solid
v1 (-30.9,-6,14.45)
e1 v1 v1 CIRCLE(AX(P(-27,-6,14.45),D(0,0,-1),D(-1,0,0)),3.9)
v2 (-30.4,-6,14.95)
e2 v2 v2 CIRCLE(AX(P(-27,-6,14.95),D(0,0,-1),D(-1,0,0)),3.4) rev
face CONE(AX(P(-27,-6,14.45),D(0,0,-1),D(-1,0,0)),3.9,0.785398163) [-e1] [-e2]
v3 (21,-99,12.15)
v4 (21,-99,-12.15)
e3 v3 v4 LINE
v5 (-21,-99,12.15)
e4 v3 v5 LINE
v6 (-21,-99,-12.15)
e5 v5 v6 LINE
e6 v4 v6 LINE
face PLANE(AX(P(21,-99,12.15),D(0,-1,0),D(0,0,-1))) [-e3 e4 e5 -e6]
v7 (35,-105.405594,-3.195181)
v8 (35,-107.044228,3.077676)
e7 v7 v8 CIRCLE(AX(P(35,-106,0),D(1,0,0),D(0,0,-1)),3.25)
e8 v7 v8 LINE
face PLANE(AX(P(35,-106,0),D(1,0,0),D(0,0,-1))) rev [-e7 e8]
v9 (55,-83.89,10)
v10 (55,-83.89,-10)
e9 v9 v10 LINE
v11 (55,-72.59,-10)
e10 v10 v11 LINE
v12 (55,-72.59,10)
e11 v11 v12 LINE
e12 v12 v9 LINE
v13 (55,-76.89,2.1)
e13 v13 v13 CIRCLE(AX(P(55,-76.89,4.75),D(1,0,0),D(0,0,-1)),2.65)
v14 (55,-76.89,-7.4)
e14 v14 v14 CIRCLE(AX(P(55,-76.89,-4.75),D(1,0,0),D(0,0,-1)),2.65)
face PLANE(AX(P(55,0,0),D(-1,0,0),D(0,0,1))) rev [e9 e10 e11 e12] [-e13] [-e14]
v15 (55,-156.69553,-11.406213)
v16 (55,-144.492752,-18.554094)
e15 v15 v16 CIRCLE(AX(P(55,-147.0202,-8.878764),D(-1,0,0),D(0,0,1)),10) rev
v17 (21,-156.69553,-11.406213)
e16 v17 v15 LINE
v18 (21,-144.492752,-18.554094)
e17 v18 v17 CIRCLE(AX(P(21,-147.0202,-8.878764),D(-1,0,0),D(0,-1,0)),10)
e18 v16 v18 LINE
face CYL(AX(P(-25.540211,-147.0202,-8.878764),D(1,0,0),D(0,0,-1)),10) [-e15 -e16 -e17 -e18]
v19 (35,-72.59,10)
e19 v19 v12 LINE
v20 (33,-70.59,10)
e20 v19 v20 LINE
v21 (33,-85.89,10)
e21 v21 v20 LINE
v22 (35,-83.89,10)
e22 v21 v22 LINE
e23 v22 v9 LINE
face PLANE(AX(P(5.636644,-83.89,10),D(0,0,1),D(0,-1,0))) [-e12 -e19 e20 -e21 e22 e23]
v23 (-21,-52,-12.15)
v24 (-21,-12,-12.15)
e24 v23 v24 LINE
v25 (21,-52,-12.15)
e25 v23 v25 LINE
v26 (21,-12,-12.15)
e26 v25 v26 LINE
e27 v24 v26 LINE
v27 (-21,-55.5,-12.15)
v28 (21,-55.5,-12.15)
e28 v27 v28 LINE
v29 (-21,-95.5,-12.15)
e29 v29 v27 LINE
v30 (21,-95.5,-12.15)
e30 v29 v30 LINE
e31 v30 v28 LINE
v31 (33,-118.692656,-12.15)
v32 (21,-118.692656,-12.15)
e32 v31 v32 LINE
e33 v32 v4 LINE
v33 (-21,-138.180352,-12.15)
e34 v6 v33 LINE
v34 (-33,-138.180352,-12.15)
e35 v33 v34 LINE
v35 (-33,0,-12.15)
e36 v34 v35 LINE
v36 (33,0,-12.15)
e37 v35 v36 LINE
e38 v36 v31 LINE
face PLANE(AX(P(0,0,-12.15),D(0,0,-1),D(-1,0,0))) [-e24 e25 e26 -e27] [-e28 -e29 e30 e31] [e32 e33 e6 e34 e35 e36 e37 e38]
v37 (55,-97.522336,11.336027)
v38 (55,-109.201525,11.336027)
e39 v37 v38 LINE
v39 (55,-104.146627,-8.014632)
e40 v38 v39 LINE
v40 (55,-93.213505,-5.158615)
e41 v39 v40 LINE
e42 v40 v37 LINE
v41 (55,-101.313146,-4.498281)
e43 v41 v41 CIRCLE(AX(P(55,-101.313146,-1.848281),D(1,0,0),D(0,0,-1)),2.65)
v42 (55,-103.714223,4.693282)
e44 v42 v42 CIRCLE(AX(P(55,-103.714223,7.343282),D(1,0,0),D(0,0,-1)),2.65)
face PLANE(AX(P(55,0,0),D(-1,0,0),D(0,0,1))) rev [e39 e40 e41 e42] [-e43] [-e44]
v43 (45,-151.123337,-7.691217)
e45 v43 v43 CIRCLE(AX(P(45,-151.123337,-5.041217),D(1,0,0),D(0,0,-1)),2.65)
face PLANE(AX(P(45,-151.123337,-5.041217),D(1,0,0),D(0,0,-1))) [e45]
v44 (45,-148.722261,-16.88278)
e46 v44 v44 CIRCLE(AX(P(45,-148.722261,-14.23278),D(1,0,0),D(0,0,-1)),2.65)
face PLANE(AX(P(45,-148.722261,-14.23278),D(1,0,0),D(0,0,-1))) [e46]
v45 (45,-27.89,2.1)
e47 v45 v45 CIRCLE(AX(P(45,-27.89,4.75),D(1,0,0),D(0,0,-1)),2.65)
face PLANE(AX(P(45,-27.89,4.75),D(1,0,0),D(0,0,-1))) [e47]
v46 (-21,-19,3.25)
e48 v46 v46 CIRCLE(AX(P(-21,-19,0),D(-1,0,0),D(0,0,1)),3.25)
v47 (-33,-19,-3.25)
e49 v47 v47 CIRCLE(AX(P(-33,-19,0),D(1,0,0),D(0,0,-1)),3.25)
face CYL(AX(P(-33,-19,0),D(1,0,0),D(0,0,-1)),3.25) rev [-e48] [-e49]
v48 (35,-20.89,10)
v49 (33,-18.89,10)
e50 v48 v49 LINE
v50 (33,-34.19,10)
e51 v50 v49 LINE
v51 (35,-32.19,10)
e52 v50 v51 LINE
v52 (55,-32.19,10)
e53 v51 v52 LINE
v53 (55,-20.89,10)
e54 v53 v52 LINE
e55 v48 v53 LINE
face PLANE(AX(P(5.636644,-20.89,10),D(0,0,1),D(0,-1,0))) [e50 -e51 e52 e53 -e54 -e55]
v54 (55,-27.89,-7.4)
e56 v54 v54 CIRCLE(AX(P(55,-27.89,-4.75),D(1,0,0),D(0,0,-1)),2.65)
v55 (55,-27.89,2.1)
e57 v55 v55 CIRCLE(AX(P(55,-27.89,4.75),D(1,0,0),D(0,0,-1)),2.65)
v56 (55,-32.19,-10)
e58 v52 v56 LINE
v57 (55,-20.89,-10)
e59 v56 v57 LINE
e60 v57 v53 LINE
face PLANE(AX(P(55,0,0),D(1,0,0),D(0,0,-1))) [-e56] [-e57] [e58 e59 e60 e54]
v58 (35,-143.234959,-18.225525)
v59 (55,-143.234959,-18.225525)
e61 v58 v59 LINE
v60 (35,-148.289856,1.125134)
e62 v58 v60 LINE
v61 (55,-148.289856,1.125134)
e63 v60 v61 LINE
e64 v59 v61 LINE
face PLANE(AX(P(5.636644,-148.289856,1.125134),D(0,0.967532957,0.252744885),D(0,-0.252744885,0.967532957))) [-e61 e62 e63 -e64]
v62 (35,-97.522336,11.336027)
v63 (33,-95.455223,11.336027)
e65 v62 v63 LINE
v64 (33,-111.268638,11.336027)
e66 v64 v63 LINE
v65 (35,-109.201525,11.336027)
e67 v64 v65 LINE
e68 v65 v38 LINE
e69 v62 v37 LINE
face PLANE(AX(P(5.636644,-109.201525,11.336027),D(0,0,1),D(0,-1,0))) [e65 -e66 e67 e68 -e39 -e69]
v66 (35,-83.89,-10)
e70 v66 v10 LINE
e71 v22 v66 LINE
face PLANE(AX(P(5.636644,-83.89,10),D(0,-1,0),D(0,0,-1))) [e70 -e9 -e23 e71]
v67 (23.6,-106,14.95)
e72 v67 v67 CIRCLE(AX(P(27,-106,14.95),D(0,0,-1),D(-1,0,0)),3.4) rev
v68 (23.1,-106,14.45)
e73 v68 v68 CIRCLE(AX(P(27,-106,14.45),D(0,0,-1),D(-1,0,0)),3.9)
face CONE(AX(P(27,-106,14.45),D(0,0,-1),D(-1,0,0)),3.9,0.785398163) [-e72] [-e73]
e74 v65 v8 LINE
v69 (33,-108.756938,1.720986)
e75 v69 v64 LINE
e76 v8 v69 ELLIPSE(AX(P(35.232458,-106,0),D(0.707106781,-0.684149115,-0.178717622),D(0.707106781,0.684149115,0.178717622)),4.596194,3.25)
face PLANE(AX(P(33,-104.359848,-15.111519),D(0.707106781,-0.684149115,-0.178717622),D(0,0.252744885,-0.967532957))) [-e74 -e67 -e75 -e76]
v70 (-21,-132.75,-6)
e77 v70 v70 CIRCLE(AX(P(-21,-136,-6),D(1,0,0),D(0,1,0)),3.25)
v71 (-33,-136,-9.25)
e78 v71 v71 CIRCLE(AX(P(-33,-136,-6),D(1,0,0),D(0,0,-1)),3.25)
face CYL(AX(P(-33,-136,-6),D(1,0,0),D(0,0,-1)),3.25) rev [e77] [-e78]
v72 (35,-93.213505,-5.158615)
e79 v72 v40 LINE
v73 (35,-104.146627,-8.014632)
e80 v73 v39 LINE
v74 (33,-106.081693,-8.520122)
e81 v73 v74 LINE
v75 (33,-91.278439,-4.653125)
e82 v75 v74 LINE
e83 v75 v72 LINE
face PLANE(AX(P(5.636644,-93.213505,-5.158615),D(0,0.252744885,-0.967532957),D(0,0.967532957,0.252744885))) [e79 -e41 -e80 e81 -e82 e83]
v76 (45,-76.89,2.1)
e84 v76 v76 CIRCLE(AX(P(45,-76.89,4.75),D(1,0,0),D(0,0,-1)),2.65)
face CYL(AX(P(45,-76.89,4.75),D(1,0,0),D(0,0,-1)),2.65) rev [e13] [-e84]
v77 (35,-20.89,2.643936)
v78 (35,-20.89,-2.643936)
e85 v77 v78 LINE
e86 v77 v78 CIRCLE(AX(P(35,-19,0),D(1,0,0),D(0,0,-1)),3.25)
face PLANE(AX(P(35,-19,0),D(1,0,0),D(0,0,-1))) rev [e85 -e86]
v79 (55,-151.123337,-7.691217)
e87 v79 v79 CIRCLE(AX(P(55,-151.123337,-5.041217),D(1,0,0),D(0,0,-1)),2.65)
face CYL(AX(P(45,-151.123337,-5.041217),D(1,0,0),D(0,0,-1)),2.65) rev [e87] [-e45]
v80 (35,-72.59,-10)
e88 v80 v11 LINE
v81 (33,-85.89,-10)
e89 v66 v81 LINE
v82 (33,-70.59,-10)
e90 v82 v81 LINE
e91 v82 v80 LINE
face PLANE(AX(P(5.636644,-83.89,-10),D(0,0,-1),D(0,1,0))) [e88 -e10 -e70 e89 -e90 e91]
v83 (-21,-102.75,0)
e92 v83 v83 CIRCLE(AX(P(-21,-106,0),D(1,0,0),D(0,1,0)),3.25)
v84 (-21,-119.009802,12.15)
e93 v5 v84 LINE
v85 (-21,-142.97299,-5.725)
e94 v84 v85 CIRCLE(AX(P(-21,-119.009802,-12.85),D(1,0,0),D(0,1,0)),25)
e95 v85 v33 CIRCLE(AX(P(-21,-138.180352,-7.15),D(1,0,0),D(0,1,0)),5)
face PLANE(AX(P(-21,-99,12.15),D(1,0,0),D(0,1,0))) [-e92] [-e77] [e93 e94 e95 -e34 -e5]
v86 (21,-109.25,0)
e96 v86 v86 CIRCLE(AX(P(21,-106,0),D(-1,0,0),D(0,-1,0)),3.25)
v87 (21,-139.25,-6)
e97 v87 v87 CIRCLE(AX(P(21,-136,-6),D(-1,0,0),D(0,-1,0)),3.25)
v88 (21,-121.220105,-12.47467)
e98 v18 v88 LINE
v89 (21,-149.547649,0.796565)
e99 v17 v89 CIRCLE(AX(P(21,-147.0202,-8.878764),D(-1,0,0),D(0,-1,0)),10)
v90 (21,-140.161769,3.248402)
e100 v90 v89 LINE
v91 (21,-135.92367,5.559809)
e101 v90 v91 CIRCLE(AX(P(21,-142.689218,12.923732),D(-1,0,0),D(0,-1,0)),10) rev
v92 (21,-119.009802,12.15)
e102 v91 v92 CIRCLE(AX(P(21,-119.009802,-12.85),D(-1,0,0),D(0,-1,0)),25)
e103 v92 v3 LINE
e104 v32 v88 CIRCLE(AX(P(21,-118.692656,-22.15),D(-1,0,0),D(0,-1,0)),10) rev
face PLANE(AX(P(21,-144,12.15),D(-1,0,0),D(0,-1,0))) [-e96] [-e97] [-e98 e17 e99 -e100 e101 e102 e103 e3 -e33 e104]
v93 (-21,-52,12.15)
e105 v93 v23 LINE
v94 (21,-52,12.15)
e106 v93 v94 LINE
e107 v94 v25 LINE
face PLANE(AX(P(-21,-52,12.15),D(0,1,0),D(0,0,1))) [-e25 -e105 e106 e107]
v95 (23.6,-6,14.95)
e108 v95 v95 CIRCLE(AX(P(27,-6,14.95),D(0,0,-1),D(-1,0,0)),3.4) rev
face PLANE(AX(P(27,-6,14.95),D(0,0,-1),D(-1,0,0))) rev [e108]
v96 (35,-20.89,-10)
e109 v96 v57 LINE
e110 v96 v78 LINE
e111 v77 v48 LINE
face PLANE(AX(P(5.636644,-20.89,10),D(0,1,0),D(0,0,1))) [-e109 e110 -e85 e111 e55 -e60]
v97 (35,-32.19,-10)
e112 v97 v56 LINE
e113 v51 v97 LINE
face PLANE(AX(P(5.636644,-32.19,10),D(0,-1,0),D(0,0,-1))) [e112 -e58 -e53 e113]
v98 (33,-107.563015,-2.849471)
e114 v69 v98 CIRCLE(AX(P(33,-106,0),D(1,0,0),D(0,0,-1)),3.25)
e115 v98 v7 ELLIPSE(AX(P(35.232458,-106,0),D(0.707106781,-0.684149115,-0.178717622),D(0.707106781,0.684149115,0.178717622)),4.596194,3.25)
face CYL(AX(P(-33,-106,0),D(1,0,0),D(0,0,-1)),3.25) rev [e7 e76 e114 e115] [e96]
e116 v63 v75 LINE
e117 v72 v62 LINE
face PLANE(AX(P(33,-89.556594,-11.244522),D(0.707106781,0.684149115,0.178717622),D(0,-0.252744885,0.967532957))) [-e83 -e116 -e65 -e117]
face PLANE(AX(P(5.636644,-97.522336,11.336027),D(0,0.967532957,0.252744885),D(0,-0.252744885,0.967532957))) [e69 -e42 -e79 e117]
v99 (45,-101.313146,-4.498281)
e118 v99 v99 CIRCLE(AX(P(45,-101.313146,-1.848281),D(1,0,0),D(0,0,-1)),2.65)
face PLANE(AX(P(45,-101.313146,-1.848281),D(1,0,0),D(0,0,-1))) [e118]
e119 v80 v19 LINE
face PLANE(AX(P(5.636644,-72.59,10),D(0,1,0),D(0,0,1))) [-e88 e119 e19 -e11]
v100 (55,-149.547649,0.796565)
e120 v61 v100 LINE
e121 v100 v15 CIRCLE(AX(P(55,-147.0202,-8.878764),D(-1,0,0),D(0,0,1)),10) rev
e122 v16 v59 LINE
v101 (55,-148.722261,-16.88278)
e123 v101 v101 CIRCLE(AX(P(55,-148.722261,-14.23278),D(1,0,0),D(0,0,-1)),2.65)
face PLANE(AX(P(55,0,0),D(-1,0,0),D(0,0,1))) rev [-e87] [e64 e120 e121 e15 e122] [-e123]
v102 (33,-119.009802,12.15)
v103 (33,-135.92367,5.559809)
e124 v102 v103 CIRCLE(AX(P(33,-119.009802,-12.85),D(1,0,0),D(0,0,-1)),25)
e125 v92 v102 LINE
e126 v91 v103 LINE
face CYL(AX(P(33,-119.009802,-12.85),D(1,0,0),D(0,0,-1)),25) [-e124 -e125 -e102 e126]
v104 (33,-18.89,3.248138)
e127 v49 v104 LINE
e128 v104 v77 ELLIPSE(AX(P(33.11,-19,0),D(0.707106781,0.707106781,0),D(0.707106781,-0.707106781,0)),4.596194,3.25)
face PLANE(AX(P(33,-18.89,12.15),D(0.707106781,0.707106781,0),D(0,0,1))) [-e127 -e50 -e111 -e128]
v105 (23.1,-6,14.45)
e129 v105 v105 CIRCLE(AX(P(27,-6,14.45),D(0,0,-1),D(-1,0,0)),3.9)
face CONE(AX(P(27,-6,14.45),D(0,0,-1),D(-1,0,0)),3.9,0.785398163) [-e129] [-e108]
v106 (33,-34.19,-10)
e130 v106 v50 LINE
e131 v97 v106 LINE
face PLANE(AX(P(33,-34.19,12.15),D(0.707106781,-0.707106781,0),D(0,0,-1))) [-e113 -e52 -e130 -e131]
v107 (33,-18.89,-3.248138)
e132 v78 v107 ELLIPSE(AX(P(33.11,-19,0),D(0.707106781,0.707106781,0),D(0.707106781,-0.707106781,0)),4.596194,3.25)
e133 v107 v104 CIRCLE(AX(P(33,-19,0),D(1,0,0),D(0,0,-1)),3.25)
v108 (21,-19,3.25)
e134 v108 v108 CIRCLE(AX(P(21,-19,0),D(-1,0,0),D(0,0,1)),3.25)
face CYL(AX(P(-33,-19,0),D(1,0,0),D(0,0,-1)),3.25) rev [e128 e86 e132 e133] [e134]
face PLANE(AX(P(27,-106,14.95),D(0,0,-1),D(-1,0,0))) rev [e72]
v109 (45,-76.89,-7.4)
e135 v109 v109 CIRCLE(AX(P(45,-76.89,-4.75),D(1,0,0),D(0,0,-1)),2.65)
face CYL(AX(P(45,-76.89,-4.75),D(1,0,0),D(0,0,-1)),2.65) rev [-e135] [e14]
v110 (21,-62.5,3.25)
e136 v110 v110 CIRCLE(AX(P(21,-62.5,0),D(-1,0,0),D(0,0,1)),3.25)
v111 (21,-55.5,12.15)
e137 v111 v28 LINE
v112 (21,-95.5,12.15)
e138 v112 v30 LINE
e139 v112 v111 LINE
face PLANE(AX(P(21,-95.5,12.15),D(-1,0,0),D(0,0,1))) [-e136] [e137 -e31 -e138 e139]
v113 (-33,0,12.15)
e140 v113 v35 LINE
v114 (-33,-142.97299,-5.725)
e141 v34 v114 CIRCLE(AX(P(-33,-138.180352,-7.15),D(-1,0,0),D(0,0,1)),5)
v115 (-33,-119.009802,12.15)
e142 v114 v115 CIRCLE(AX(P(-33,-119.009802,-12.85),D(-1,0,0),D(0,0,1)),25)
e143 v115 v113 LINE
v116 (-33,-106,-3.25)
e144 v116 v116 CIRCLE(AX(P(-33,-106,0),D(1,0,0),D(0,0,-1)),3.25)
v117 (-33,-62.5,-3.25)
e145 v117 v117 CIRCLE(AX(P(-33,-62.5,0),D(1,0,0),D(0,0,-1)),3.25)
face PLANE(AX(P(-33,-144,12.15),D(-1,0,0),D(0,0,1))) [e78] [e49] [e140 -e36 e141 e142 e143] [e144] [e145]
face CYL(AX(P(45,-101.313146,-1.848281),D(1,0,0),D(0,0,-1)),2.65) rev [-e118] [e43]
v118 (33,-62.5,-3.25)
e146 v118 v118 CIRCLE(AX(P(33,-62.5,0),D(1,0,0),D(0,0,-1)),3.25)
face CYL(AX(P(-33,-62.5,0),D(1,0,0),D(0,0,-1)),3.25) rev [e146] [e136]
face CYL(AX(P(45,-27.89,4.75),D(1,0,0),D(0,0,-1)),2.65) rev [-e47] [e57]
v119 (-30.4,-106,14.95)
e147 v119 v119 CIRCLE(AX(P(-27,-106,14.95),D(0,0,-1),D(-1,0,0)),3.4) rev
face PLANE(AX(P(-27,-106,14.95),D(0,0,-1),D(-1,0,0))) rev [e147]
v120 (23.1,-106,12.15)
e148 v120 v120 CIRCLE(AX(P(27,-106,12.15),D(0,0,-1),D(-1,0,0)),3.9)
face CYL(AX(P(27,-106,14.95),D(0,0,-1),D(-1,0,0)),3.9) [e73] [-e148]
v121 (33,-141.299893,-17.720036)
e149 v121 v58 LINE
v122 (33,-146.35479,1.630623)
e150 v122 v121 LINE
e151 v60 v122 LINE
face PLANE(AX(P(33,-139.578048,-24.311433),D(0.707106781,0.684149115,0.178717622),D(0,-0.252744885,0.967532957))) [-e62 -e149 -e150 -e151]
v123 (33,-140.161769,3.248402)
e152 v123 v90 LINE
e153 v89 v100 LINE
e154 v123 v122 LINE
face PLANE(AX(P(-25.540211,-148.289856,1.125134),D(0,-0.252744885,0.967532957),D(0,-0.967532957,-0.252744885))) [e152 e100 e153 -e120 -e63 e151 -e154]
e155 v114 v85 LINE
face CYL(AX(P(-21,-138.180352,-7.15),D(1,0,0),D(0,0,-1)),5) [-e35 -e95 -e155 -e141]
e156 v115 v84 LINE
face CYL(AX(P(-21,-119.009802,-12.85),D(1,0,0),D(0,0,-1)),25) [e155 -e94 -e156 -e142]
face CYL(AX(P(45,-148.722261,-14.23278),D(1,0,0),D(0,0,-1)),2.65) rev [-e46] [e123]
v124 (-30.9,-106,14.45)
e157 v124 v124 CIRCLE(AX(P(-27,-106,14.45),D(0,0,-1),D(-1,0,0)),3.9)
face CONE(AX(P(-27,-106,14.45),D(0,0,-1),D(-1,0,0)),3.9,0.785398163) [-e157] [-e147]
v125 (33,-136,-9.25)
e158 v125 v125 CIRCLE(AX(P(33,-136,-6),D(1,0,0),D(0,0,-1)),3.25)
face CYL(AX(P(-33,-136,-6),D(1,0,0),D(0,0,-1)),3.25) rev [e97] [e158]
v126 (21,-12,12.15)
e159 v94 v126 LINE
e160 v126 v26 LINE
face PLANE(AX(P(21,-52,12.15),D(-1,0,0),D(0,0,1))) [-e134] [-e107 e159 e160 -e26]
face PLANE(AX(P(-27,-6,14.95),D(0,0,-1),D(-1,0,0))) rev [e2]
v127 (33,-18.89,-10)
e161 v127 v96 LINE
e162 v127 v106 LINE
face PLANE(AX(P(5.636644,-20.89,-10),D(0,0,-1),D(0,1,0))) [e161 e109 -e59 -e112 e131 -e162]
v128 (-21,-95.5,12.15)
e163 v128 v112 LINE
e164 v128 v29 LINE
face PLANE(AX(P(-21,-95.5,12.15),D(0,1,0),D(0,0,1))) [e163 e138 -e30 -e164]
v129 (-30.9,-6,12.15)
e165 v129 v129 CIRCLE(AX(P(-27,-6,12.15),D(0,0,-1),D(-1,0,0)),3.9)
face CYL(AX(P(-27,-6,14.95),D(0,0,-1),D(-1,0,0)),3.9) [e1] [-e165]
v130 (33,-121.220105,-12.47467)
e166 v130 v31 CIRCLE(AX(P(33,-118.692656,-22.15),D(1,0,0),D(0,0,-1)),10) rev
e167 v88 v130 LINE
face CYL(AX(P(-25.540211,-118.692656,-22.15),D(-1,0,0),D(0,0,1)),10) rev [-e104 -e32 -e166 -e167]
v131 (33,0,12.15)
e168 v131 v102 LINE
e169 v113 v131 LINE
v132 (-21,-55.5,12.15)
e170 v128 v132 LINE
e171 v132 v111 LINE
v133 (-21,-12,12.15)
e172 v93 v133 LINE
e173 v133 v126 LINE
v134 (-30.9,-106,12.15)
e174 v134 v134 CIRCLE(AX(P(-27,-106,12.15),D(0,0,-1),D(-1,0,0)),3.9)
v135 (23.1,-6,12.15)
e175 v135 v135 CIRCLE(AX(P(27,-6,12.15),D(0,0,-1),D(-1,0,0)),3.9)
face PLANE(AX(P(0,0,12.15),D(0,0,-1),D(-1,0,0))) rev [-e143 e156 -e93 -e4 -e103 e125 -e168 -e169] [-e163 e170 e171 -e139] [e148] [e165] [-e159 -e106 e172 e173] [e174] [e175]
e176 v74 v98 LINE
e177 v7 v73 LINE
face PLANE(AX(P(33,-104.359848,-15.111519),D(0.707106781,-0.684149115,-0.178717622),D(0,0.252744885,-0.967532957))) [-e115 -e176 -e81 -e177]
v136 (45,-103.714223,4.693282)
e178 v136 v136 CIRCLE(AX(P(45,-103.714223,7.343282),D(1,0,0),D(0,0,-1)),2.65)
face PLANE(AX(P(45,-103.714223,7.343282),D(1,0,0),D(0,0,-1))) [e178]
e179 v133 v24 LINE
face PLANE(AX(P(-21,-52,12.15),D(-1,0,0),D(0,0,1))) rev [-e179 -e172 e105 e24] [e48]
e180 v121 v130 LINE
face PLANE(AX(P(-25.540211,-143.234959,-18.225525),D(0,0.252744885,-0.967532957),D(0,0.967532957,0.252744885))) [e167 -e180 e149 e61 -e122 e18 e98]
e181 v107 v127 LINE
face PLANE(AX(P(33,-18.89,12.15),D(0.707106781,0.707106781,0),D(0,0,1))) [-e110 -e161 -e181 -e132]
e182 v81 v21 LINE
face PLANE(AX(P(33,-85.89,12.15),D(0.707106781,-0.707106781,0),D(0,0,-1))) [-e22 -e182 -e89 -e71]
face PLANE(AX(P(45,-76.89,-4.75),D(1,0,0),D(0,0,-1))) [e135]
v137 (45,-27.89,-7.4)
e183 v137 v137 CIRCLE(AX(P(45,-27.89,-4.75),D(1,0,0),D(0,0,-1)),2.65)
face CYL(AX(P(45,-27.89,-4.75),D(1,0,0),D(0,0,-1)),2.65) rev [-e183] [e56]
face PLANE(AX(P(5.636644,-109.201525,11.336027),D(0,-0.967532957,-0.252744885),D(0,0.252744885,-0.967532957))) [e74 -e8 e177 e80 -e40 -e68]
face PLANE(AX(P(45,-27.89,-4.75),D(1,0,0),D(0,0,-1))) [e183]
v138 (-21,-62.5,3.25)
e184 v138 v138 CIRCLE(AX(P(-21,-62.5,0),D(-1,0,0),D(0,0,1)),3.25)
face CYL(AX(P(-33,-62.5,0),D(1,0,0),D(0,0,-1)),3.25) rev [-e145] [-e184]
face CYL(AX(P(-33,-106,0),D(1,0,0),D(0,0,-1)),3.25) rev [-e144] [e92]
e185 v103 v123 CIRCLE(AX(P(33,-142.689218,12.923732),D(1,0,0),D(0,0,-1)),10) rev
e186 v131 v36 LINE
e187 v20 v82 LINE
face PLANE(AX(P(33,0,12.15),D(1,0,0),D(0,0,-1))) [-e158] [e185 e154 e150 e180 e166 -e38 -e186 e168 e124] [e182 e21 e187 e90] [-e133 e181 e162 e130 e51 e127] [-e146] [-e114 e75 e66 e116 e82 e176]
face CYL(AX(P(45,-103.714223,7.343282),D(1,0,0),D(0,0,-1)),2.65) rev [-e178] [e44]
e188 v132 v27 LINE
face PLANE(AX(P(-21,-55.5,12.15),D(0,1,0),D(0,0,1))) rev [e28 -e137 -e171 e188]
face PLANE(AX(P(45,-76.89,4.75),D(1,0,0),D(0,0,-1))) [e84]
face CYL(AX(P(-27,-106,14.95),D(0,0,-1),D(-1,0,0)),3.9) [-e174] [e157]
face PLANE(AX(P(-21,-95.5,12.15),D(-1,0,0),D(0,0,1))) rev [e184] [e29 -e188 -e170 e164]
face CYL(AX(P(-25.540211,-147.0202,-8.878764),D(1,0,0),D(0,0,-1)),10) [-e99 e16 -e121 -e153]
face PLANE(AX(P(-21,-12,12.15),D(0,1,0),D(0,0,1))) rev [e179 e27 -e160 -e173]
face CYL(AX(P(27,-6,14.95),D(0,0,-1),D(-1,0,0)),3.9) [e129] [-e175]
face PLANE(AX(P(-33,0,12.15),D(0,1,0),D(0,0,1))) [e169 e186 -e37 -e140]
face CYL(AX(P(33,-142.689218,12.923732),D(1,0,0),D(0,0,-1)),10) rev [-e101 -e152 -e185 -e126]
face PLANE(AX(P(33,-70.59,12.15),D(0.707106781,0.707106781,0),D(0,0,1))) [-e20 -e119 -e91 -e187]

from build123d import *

# Parameters (mm, degrees)
SKETCH2_W               = 42
SKETCH2_H               = 40
BOSS_EXTRUDE1_DEPTH     = 12.15
CUT_EXTRUDE1_DEPTH      = 149.231651478
CUT_EXTRUDE1_DEPTH_BACK = 149.231651478
SKETCH3_R               = 3.25
FILLET1_R               = 25
FILLET2_R               = 5
SKETCH4_R               = 3.9
BOSS_EXTRUDE2_DEPTH     = 2.8
CHAMFER1_SIZE           = 0.5
SKETCH6_W               = 20
SKETCH6_H               = 11.3
BOSS_EXTRUDE3_DEPTH     = 22
BOSS_EXTRUDE5_DEPTH     = 12
SKETCH7_R               = 2.65
CUT_EXTRUDE2_DEPTH      = 10
FILLET3_R               = 10
CHAMFER3_SIZE           = 2
SKETCH9_R               = 3.25
CUT_EXTRUDE3_DEPTH      = 2


# Some blends are built 0.0001 mm under size
with BuildPart() as part:
    # Sketch2 → Boss-Extrude1 (new, symmetric)
    with BuildSketch(Plane.XY):
        Polygon((-33, 0), (33, 0), (33, -144), (21, -144), (21, -99), (-21, -99), (-21, -144), (-33, -144), align=None)
        with Locations((0, -32)):
            Rectangle(SKETCH2_W, SKETCH2_H, mode=Mode.SUBTRACT)
        with Locations((0, -75.5)):
            Rectangle(SKETCH2_W, SKETCH2_H, mode=Mode.SUBTRACT)
    extrude(amount=BOSS_EXTRUDE1_DEPTH, both=True)

    # Sketch3 → Cut-Extrude1 (cut, two sides: drawn at the far end of the back side and taken through both)
    with BuildSketch(Plane(origin=(0, 0, 0), x_dir=(0, 0, -1), z_dir=(1, 0, 0)).offset(-CUT_EXTRUDE1_DEPTH_BACK)):
        with Locations((0, -106)):
            Circle(SKETCH3_R)
        with Locations((0, -62.5)):
            Circle(SKETCH3_R)
        with Locations((0, -19)):
            Circle(SKETCH3_R)
        with Locations((6, -136)):
            Circle(SKETCH3_R)
    extrude(amount=CUT_EXTRUDE1_DEPTH + CUT_EXTRUDE1_DEPTH_BACK, mode=Mode.SUBTRACT)

    # Fillet1
    # the kernel refuses this fillet: 25 mm, written as the material it takes off along each edge
    with BuildSketch(Plane(origin=(95.475495196, -144, 12.15), x_dir=(0, 1, 0), z_dir=(-1, 0, 0)), Plane(origin=(41.475495196, -144, 12.15), x_dir=(0, 1, 0), z_dir=(-1, 0, 0))) as fillet1_piece_1:
        with BuildLine():
            CenterArc((24.990198078, 25), FILLET1_R, 181.604491527, 88.395508473)
            Line((0, 24.3), (-0.499803962, 24.286))
            ThreePointArc((-0.499803962, 24.286), (-0.5, 12.15), (-0.5, 0))
            Line((-0.5, 0), (0, -0.5))
            Line((0, -0.5), (24.990198078, -0.5))
            Line((24.990198078, -0.5), (24.990198078, 0))
        make_face()
    extrude(amount=136.950990392, mode=Mode.SUBTRACT)

    # Fillet2
    fillet2_edges = [part.edges().sort_by_distance(p)[0] for p in [
        (-27, -144, -12.15),
        (27, -144, -12.15),
    ]]
    fillet(fillet2_edges, radius=FILLET2_R)

    # Sketch4 → Boss-Extrude2 (add)
    with BuildSketch(Plane(origin=(0, 0, 12.15), x_dir=(-1, 0, 0), z_dir=(0, 0, -1))):
        with Locations((-27, -6)):
            Circle(SKETCH4_R)
        with Locations((27, -6)):
            Circle(SKETCH4_R)
        with Locations((27, -106)):
            Circle(SKETCH4_R)
        with Locations((-27, -106)):
            Circle(SKETCH4_R)
    extrude(amount=-BOSS_EXTRUDE2_DEPTH)

    # Chamfer1
    chamfer1_edges = [part.edges().sort_by_distance(p)[0] for p in [
        (30.9, -6, 14.95),
        (-23.1, -6, 14.95),
        (-23.1, -106, 14.95),
        (30.9, -106, 14.95),
    ]]
    chamfer(chamfer1_edges, length=CHAMFER1_SIZE)

    # Sketch6 → Boss-Extrude3 (add)
    with BuildSketch(Plane(origin=(55, 0, 0), x_dir=(0, 0, -1), z_dir=(1, 0, 0))):
        with Locations((0, -26.54)):
            Rectangle(SKETCH6_W, SKETCH6_H)
        with Locations((0, -78.24)):
            Rectangle(SKETCH6_W, SKETCH6_H)
        Polygon((-1.125133679, -148.289856389), (18.225525462, -143.234958685), (21.081542665, -154.168081099), (1.730883524, -159.222978804), align=None)
        Polygon((-11.336027041, -97.522336202), (5.158614897, -93.213504805), (8.0146321, -104.146627219), (-11.336027041, -109.201524924), align=None)
    extrude(amount=-BOSS_EXTRUDE3_DEPTH)


with BuildPart() as boss_extrude3_piece_1:
    # of the separate pieces the step leaves, piece 1, a body of its own (boss_extrude3_pieces)
    add(part.part.solids().sort_by_distance((23.1, -106, 14.45))[0])



with BuildPart() as boss_extrude3_piece_2:
    # of the separate pieces the step leaves, piece 2, a body of its own (boss_extrude3_pieces)
    add(part.part.solids().sort_by_distance((55, -148.289856389, 1.125133679))[0])


with BuildPart() as boss_extrude3_piece_1_1:
    add(boss_extrude3_piece_1.part)

    add(boss_extrude3_piece_2.part)  # Boss-Extrude5 merges Boss-Extrude3 piece 2
    # Sketch8 → Boss-Extrude5 (add)
    with BuildSketch(Plane(origin=(33, 0, 0), x_dir=(0, 0, -1), z_dir=(1, 0, 0))):
        with BuildLine():
            Line((-1.125133679, -148.289856389), (-3.933707562, -137.538351797))
            ThreePointArc((-3.933707562, -137.538351797), (0.590701612, -140.797633457), (5.725, -142.972989836))
            ThreePointArc((5.725, -142.972989836), (10.139565186, -142.188157138), (12.15, -138.180352253))
            Line((12.15, -138.180352253), (12.15, -119.977233364))
            Line((12.15, -119.977233364), (18.225525462, -143.234958685))
            Line((18.225525462, -143.234958685), (21.081542665, -154.168081099))
            Line((21.081542665, -154.168081099), (1.730883524, -159.222978804))
            Line((1.730883524, -159.222978804), (-1.125133679, -148.289856389))
        make_face()
    extrude(amount=-BOSS_EXTRUDE5_DEPTH)

    # Sketch7 → Cut-Extrude2 (cut)
    with BuildSketch(Plane(origin=(55, 0, 0), x_dir=(0, 0, -1), z_dir=(1, 0, 0))):
        with Locations((-4.75, -27.89)):
            Circle(SKETCH7_R)
        with Locations((4.75, -27.89)):
            Circle(SKETCH7_R)
        with Locations((-4.75, -76.89)):
            Circle(SKETCH7_R)
        with Locations((4.75, -76.89)):
            Circle(SKETCH7_R)
        with Locations((-7.343282023, -103.714222561)):
            Circle(SKETCH7_R)
        with Locations((1.848281069, -101.313146151)):
            Circle(SKETCH7_R)
        with Locations((5.041217352, -151.123337457)):
            Circle(SKETCH7_R)
        with Locations((14.232780444, -148.722261047)):
            Circle(SKETCH7_R)
    extrude(amount=-CUT_EXTRUDE2_DEPTH, mode=Mode.SUBTRACT)

    # Fillet3
    fillet3_edges = [boss_extrude3_piece_1_1.edges().sort_by_distance(p)[0] for p in [
        (38, -159.222978804, -1.730883524),
        (38, -154.168081099, -21.081542665),
        (27, -119.977233364, -12.15),
        (27, -137.538351797, 3.933707562),
    ]]
    fillet(fillet3_edges, radius=FILLET3_R - 0.0001)  # a hair under: the kernel refuses the full size

    # Chamfer3
    # the kernel refuses this chamfer: 2 mm, written as the material it adds along each edge
    with BuildSketch(Plane(origin=(33, -20.89, 2.499429517), x_dir=(-0.027495876610585647, 0.9996219169112968, 0), z_dir=(0, 0, -1))) as chamfer3_piece_1_section:
        Polygon((CHAMFER3_SIZE * 0.999621916911, CHAMFER3_SIZE * 0.0274958766106), (-CHAMFER3_SIZE * 0.0274958766106, CHAMFER3_SIZE * 0.999621916911), (0, 0), align=None)
    chamfer3_piece_1 = extrude(amount=12.499429517, mode=Mode.PRIVATE)
    chamfer3_piece_1 = chamfer3_piece_1 - Plane(origin=(33.672455273, -19, 0), x_dir=(0, 0, -1), z_dir=(-1, 0, 0)) * Cylinder(3.25, 33, mode=Mode.PRIVATE)
    add(chamfer3_piece_1)
    with BuildSketch(Plane(origin=(33, -20.89, 10), x_dir=(-0.027495876610585647, 0.9996219169112968, 0), z_dir=(0, 0, -1))) as chamfer3_piece_2_section:
        Polygon((CHAMFER3_SIZE * 0.999621916911, CHAMFER3_SIZE * 0.0274958766106), (-CHAMFER3_SIZE * 0.0274958766106, CHAMFER3_SIZE * 0.999621916911), (0, 0), align=None)
    chamfer3_piece_2 = extrude(amount=12.499429517, mode=Mode.PRIVATE)
    chamfer3_piece_2 = chamfer3_piece_2 - Plane(origin=(33.672455268, -19, 0), x_dir=(0, 0, -1), z_dir=(-1, 0, 0)) * Cylinder(3.25, 33, mode=Mode.PRIVATE)
    add(chamfer3_piece_2)
    with BuildSketch(Plane(origin=(33, -32.19, -10), x_dir=(-0.027495876610585647, -0.9996219169112968, 0), z_dir=(0, 0, 1)), Plane(origin=(33, -72.59, 10), x_dir=(-0.02749587661058555, 0.9996219169112968, 0), z_dir=(0, 0, -1)), Plane(origin=(33, -83.89, -10), x_dir=(-0.02749587661058555, -0.9996219169112968, 0), z_dir=(0, 0, 1)), Plane(origin=(33, -148.289856389, 1.125133679), x_dir=(-0.02749587661058553, 0.967167149212802, 0.2526493266426751), z_dir=(0, 0.25274488520952904, -0.96753295706163))) as chamfer3_piece_3:
        Polygon((CHAMFER3_SIZE * 0.999621916911, CHAMFER3_SIZE * 0.0274958766106), (-CHAMFER3_SIZE * 0.0274958766106, CHAMFER3_SIZE * 0.999621916911), (0, 0), align=None)
    extrude(amount=20)
    with BuildSketch(Plane(origin=(33, -105.744268383, -1.898700305), x_dir=(-0.0274958766105857, -0.9671671492128014, -0.25264932664267675), z_dir=(0, -0.25274488520953076, 0.9675329570616297))) as chamfer3_piece_4_section:
        Polygon((CHAMFER3_SIZE * 0.999621916911, CHAMFER3_SIZE * 0.0274958766106), (-CHAMFER3_SIZE * 0.0274958766106, CHAMFER3_SIZE * 0.999621916911), (0, 0), align=None)
    chamfer3_piece_4 = extrude(amount=18.822204769, mode=Mode.PRIVATE)
    chamfer3_piece_4 = chamfer3_piece_4 - Plane(origin=(33.659062182, -106, 0), x_dir=(0, 0, -1), z_dir=(-1, 0, 0)) * Cylinder(3.25, 46, mode=Mode.PRIVATE)
    chamfer3_piece_4 = split(chamfer3_piece_4, bisect_by=Plane(origin=(33.659062182, -108.784347248, 11.336027041), z_dir=(0, 0, -1)), keep=Keep.TOP, mode=Mode.PRIVATE)
    add(chamfer3_piece_4)
    with BuildSketch(Plane(origin=(33, -98.822295645, 16.312403133), x_dir=(-0.027495876610585716, 0.9671671492128022, 0.25264932664267414), z_dir=(0, 0.25274488520952815, -0.9675329570616303))) as chamfer3_piece_5_section:
        Polygon((CHAMFER3_SIZE * 0.999621916911, CHAMFER3_SIZE * 0.0274958766106), (-CHAMFER3_SIZE * 0.0274958766106, CHAMFER3_SIZE * 0.999621916911), (0, 0), align=None)
    chamfer3_piece_5 = extrude(amount=22.191510763, mode=Mode.PRIVATE)
    chamfer3_piece_5 = split(chamfer3_piece_5, bisect_by=Plane(origin=(33.668386777, -94.70433277, 11.336027041), z_dir=(0, 0, -1)), keep=Keep.TOP, mode=Mode.PRIVATE)
    add(chamfer3_piece_5)
    with BuildSketch(Plane(origin=(33, -104.146627219, -8.0146321), x_dir=(-0.027495876610585706, -0.9671671492128016, -0.25264932664267675), z_dir=(0, -0.25274488520953076, 0.9675329570616297))) as chamfer3_piece_6_section:
        Polygon((CHAMFER3_SIZE * 0.999621916911, CHAMFER3_SIZE * 0.0274958766106), (-CHAMFER3_SIZE * 0.0274958766106, CHAMFER3_SIZE * 0.999621916911), (0, 0), align=None)
    chamfer3_piece_6 = extrude(amount=10.124541165, mode=Mode.PRIVATE)
    chamfer3_piece_6 = chamfer3_piece_6 - Plane(origin=(33.659192964, -106, 0), x_dir=(0, 0, -1), z_dir=(-1, 0, 0)) * Cylinder(3.25, 29, mode=Mode.PRIVATE)
    add(chamfer3_piece_6)

    # Sketch9 → Cut-Extrude3 (cut)
    with BuildSketch(Plane(origin=(33, 0, 0), x_dir=(0, 0, -1), z_dir=(1, 0, 0))):
        with Locations((0, -19)):
            Circle(SKETCH9_R)
        with Locations((0, -106)):
            Circle(SKETCH9_R)
    extrude(amount=CUT_EXTRUDE3_DEPTH, mode=Mode.SUBTRACT)


solid = boss_extrude3_piece_1_1.part
